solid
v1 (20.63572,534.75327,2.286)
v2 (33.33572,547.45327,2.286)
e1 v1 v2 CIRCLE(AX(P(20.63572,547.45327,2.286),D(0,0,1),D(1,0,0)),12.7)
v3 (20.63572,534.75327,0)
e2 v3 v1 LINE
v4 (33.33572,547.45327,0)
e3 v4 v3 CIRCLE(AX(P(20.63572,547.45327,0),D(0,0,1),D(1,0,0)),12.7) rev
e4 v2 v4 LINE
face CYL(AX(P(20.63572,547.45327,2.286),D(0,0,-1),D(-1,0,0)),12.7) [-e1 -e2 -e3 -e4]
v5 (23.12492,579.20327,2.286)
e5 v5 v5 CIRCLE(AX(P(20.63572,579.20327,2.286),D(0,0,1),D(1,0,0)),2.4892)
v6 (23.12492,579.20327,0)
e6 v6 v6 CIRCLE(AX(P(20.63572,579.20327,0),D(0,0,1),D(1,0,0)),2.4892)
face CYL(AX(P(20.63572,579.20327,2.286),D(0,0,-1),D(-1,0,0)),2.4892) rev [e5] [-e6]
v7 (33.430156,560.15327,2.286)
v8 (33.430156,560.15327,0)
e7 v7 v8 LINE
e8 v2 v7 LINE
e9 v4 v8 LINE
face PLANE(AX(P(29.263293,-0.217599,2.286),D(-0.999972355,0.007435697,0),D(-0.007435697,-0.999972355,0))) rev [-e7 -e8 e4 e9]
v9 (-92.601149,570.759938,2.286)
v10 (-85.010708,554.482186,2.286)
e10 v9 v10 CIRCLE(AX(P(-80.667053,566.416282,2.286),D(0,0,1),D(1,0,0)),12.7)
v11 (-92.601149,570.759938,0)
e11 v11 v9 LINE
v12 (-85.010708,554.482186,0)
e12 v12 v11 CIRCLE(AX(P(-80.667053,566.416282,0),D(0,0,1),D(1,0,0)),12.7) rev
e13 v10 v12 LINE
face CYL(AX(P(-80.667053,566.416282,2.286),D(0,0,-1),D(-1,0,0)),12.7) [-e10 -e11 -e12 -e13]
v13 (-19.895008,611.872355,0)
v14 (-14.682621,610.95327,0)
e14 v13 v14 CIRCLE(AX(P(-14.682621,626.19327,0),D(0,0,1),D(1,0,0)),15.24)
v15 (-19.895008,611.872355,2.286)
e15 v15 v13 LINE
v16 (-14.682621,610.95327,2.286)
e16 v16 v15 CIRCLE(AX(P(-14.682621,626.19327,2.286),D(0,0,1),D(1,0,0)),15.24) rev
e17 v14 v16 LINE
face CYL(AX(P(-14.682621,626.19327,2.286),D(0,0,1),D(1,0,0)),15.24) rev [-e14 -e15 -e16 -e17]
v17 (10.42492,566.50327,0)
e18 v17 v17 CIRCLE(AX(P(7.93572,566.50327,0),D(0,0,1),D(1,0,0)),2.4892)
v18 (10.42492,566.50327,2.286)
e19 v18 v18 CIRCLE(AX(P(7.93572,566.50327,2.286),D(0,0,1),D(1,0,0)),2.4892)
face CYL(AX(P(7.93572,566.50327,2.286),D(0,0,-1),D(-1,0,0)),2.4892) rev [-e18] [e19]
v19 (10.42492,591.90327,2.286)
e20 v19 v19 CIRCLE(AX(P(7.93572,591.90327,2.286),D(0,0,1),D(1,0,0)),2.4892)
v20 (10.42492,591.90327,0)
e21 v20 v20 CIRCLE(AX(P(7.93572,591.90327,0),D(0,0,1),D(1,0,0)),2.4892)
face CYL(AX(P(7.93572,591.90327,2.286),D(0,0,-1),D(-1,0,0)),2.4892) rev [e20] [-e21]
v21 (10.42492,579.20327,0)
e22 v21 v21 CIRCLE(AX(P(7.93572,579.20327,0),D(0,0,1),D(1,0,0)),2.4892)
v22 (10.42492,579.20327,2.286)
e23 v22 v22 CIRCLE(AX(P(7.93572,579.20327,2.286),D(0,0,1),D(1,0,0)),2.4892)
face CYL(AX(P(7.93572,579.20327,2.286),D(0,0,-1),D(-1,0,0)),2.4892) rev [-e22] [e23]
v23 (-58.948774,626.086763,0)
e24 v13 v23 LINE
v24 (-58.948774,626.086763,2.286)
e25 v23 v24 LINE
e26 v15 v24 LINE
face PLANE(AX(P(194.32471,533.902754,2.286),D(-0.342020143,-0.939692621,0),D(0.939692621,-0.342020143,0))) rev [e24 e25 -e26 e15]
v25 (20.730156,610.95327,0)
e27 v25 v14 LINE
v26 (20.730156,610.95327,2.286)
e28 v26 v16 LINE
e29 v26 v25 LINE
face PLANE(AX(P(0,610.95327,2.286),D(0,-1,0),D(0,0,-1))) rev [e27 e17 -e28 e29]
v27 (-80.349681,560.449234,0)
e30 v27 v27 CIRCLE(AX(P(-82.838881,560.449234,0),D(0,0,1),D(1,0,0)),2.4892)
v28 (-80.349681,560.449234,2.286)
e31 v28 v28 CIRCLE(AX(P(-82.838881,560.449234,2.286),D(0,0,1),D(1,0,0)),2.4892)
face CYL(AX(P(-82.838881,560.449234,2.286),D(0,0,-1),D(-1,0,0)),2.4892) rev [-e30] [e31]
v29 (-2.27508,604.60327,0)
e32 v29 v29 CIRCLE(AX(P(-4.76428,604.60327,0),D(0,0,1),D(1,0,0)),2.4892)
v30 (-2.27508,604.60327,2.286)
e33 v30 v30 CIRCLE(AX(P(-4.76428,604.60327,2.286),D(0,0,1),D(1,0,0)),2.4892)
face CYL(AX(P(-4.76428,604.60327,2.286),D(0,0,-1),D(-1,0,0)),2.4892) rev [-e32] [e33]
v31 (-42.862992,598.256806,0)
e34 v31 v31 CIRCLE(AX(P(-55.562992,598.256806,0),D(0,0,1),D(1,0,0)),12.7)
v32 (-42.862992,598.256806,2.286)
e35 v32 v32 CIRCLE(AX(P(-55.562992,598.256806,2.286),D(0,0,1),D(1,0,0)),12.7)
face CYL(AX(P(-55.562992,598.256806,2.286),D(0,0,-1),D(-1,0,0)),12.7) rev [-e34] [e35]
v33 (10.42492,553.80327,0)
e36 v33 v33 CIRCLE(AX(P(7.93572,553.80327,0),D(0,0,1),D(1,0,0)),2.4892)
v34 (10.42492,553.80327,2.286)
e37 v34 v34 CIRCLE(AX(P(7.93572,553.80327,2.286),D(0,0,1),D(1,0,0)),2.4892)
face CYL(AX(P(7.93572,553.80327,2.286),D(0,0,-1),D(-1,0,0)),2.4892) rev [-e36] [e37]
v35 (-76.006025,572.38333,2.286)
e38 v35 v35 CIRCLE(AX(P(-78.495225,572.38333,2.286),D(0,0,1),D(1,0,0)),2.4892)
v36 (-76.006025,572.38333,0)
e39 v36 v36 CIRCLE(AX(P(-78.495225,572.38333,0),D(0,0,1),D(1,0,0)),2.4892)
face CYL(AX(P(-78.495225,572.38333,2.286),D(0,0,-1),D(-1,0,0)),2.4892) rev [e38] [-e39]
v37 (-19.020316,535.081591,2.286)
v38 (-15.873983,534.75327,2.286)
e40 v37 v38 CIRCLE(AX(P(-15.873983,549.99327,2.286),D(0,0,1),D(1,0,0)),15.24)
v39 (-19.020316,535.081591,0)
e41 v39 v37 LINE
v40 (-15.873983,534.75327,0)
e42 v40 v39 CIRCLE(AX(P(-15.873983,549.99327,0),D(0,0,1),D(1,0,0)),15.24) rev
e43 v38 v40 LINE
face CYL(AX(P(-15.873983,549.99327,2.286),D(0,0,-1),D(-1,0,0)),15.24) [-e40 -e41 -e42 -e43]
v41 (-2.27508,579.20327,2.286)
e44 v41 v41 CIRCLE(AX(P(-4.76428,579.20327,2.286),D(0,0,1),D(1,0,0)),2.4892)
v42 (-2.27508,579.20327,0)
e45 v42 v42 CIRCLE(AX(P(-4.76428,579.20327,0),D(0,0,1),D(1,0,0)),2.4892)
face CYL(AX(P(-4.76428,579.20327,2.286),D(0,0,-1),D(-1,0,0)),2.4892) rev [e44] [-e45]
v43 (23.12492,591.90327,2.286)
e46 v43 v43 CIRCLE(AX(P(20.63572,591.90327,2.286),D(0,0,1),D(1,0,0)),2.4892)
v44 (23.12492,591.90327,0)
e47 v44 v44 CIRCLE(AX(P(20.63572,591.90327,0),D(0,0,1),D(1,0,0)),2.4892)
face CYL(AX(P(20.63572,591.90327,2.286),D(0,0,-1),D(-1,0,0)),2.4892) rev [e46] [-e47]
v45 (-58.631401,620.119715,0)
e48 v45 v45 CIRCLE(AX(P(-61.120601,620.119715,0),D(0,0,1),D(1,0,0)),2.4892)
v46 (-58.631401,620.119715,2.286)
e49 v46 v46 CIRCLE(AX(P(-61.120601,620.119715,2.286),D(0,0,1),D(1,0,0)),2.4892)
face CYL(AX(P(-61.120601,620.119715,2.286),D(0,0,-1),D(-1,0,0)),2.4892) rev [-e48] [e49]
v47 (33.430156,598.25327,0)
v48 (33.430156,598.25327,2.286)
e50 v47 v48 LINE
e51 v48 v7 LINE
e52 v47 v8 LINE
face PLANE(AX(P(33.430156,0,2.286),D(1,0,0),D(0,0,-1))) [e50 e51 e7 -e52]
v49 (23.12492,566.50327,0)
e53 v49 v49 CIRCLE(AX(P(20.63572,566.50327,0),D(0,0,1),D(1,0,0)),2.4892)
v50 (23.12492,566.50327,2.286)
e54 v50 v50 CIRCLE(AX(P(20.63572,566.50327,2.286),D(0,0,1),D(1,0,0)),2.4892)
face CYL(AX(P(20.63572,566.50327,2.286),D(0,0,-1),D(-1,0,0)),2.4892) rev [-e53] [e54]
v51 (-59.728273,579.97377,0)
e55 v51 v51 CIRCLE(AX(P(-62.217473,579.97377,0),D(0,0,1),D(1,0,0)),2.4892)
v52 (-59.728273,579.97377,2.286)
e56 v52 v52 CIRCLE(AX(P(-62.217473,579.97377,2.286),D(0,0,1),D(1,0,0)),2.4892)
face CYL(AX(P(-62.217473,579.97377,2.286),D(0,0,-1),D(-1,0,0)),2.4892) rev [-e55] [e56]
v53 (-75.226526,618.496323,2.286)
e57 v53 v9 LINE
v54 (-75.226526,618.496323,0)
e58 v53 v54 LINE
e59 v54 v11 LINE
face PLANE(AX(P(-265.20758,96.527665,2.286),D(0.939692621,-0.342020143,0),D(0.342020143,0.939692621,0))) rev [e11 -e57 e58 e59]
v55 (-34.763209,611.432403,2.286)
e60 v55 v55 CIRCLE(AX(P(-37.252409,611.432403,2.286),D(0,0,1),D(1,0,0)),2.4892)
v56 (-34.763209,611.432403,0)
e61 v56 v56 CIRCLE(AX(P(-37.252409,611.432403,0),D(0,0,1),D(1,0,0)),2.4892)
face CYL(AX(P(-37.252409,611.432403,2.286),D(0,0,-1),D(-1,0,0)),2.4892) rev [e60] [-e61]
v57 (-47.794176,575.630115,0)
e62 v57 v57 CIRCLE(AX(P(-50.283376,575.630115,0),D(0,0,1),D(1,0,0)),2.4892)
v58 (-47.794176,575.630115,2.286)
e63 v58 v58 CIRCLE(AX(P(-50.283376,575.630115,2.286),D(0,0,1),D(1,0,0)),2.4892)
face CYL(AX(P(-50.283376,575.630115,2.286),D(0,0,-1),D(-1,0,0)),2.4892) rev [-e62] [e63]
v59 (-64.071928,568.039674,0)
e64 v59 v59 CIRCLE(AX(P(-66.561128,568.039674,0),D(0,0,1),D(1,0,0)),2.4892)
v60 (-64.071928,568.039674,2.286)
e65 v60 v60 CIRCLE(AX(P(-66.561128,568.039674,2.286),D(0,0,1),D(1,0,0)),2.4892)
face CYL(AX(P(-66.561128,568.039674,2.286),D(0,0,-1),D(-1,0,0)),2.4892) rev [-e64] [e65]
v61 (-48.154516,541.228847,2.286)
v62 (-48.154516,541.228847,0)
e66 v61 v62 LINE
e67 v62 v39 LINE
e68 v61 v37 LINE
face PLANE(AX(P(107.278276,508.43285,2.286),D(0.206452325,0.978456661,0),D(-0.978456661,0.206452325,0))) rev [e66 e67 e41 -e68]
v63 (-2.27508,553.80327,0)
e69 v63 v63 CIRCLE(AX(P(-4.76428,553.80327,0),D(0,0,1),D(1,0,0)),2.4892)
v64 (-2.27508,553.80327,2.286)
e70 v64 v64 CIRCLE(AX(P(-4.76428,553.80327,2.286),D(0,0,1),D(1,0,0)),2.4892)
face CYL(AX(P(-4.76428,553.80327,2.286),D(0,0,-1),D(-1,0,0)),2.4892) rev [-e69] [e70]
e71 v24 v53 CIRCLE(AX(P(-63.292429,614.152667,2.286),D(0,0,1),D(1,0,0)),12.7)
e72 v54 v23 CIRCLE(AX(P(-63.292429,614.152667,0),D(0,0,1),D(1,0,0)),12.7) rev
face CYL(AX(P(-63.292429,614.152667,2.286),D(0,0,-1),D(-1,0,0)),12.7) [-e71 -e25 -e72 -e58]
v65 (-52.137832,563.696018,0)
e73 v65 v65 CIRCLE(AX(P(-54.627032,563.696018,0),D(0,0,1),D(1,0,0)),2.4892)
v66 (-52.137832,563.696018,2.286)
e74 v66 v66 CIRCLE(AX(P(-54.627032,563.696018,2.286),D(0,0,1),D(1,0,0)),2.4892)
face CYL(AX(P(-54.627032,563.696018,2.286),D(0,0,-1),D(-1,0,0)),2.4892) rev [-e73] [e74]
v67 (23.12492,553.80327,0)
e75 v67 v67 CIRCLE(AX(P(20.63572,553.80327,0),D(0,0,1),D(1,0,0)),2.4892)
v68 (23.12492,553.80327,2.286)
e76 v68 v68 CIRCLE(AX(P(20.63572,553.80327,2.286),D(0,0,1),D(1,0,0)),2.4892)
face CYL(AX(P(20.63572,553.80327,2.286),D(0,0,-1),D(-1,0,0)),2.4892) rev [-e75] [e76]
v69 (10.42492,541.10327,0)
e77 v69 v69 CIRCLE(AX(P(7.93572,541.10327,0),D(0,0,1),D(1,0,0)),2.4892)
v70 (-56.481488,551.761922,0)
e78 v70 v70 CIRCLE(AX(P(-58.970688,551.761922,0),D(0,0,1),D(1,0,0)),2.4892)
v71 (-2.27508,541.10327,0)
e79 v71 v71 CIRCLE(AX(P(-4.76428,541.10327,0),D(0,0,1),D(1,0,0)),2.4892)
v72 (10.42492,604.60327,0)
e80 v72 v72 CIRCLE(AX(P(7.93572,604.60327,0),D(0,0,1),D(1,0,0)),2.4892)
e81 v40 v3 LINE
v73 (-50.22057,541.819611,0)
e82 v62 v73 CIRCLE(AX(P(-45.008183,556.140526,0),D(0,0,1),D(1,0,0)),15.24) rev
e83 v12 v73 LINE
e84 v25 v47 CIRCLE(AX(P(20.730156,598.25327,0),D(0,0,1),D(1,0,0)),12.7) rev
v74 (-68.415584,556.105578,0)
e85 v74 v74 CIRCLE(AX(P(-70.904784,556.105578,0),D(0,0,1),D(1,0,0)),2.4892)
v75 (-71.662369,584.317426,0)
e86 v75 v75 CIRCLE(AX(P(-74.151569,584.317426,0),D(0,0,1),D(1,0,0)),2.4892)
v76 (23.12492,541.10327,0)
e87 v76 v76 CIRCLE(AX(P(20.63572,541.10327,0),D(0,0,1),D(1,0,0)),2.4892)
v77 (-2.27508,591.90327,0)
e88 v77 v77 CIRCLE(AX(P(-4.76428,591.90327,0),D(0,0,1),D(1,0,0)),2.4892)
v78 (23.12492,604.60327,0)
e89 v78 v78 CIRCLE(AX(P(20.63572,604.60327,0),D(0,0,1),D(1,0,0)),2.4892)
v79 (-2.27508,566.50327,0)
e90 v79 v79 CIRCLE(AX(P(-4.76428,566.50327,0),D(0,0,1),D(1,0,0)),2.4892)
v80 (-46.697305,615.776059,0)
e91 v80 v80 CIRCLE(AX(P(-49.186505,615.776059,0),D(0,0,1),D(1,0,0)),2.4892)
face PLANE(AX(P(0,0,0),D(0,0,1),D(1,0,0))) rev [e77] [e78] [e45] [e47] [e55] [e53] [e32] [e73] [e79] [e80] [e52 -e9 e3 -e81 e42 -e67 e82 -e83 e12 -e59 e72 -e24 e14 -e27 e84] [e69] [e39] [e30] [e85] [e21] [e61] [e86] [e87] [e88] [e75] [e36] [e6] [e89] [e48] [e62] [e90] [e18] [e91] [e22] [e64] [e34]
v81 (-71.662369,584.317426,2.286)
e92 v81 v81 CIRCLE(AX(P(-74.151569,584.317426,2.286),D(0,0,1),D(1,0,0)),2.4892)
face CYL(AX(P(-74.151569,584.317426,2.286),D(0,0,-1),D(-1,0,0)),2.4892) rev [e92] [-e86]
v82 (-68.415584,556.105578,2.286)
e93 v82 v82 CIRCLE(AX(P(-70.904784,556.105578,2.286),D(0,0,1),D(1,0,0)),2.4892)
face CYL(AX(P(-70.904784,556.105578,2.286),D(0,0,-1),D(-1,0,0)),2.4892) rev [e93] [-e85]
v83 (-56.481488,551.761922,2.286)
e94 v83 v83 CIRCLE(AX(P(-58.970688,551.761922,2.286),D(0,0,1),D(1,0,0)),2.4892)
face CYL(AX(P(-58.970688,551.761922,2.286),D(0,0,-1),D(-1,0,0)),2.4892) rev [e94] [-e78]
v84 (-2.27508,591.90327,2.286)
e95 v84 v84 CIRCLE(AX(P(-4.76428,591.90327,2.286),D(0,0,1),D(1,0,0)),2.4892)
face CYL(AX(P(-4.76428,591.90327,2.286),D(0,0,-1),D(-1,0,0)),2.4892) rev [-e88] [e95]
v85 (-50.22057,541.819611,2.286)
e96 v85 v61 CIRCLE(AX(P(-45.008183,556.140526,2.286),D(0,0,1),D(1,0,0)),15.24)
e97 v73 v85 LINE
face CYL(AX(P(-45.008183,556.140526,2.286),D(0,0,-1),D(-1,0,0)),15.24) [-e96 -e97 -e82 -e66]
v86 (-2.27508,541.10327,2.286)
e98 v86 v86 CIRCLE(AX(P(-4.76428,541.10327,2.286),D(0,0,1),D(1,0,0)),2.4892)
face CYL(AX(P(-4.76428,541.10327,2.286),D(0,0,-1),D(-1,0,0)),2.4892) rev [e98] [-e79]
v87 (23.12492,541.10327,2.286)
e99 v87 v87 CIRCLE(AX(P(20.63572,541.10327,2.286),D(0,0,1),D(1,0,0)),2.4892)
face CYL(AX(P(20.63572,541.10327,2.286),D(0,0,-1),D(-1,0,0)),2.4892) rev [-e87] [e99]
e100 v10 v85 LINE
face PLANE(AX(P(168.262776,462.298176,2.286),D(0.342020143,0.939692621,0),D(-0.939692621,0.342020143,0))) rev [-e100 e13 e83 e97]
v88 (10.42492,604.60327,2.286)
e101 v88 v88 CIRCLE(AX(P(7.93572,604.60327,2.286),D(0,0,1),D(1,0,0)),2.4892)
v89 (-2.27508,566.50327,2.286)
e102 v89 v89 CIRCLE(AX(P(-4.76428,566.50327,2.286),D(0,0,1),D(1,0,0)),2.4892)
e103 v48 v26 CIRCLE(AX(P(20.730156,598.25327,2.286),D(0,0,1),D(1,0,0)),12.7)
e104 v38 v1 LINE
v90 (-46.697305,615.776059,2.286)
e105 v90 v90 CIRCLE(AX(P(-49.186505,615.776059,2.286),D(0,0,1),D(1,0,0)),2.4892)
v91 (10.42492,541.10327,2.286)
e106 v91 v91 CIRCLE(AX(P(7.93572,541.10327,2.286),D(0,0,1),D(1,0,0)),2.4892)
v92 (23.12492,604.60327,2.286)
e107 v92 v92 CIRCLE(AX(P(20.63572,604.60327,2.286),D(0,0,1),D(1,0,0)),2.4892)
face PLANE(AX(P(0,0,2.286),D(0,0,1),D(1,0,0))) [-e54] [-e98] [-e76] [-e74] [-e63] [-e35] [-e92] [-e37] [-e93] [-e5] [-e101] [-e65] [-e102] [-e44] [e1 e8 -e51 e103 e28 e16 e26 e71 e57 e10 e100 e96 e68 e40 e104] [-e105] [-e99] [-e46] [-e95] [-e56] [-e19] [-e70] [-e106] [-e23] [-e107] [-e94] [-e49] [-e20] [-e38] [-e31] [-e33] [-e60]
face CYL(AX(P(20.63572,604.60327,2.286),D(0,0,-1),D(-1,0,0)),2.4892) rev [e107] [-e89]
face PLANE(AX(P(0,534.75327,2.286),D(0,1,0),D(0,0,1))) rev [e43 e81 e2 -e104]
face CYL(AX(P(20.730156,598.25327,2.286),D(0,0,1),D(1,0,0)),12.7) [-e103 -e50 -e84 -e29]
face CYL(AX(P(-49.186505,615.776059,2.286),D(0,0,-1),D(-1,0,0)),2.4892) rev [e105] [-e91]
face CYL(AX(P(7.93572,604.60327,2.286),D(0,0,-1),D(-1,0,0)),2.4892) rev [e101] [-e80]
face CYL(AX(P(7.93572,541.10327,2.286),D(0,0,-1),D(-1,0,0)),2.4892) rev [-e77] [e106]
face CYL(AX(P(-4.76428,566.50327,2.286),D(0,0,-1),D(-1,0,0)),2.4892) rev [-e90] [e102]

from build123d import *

# Parameters (mm, degrees)
SKETCH2_R           = 2.4892
SKETCH2_R_2         = 12.7
BOSS_EXTRUDE1_DEPTH = 2.286
FILLET6_R           = 12.7
FILLET7_R           = 15.24


with BuildPart() as part:
    # Sketch2 → Boss-Extrude1 (new body)
    with BuildSketch(Plane.XY):
        Polygon((33.430156219, 560.153270419), (33.430156219, 610.953270419), (-17.369843781, 610.953270419), (-70.882869838, 630.430419049), (-92.601148921, 570.759937623), (-96.944804742, 558.825841339), (-49.208419606, 541.451218058), (-17.464279743, 534.753270419), (33.335720257, 534.753270419), (33.335720257, 547.453270419), align=None)
        with Locations((-4.764279743, 566.503270419)):
            Circle(SKETCH2_R, mode=Mode.SUBTRACT)
        with Locations((-4.764279743, 579.203270419)):
            Circle(SKETCH2_R, mode=Mode.SUBTRACT)
        with Locations((7.935720257, 566.503270419)):
            Circle(SKETCH2_R, mode=Mode.SUBTRACT)
        with Locations((20.635720257, 566.503270419)):
            Circle(SKETCH2_R, mode=Mode.SUBTRACT)
        with Locations((7.935720257, 579.203270419)):
            Circle(SKETCH2_R, mode=Mode.SUBTRACT)
        with Locations((20.635720257, 579.203270419)):
            Circle(SKETCH2_R, mode=Mode.SUBTRACT)
        with Locations((-4.764279743, 591.903270419)):
            Circle(SKETCH2_R, mode=Mode.SUBTRACT)
        with Locations((-4.764279743, 604.603270419)):
            Circle(SKETCH2_R, mode=Mode.SUBTRACT)
        with Locations((7.935720257, 591.903270419)):
            Circle(SKETCH2_R, mode=Mode.SUBTRACT)
        with Locations((20.635720257, 591.903270419)):
            Circle(SKETCH2_R, mode=Mode.SUBTRACT)
        with Locations((7.935720257, 604.603270419)):
            Circle(SKETCH2_R, mode=Mode.SUBTRACT)
        with Locations((20.635720257, 604.603270419)):
            Circle(SKETCH2_R, mode=Mode.SUBTRACT)
        with Locations((20.635720257, 553.803270419)):
            Circle(SKETCH2_R, mode=Mode.SUBTRACT)
        with Locations((-4.764279743, 553.803270419)):
            Circle(SKETCH2_R, mode=Mode.SUBTRACT)
        with Locations((7.935720257, 553.803270419)):
            Circle(SKETCH2_R, mode=Mode.SUBTRACT)
        with Locations((20.635720257, 541.103270419)):
            Circle(SKETCH2_R, mode=Mode.SUBTRACT)
        with Locations((7.935720257, 541.103270419)):
            Circle(SKETCH2_R, mode=Mode.SUBTRACT)
        with Locations((-4.764279743, 541.103270419)):
            Circle(SKETCH2_R, mode=Mode.SUBTRACT)
        with Locations((-37.25240889, 611.432403444)):
            Circle(SKETCH2_R, mode=Mode.SUBTRACT)
        with Locations((-50.283376351, 575.630114592)):
            Circle(SKETCH2_R, mode=Mode.SUBTRACT)
        with Locations((-62.217472635, 579.973770413)):
            Circle(SKETCH2_R, mode=Mode.SUBTRACT)
        with Locations((-74.151568919, 584.317426233)):
            Circle(SKETCH2_R, mode=Mode.SUBTRACT)
        with Locations((-55.562991918, 598.25680592)):
            Circle(SKETCH2_R_2, mode=Mode.SUBTRACT)
        with Locations((-61.120601458, 620.119715085)):
            Circle(SKETCH2_R, mode=Mode.SUBTRACT)
        with Locations((-49.186505174, 615.776059265)):
            Circle(SKETCH2_R, mode=Mode.SUBTRACT)
        with Locations((-78.495224739, 572.383329949)):
            Circle(SKETCH2_R, mode=Mode.SUBTRACT)
        with Locations((-54.627032171, 563.696018308)):
            Circle(SKETCH2_R, mode=Mode.SUBTRACT)
        with Locations((-66.561128455, 568.039674129)):
            Circle(SKETCH2_R, mode=Mode.SUBTRACT)
        with Locations((-58.970687991, 551.761922025)):
            Circle(SKETCH2_R, mode=Mode.SUBTRACT)
        with Locations((-82.838880559, 560.449233665)):
            Circle(SKETCH2_R, mode=Mode.SUBTRACT)
        with Locations((-70.904784275, 556.105577845)):
            Circle(SKETCH2_R, mode=Mode.SUBTRACT)
    extrude(amount=BOSS_EXTRUDE1_DEPTH)

    # Fillet6
    fillet6_edges = [part.edges().sort_by_distance(p)[0] for p in [
        (-70.882869838, 630.430419049, 1.143),
        (-96.944804742, 558.825841339, 1.143),
        (33.430156219, 610.953270419, 1.143),
        (33.335720257, 534.753270419, 1.143),
    ]]
    fillet(fillet6_edges, radius=FILLET6_R - 0.0001)  # a hair under: the kernel refuses the full size

    # Fillet7
    fillet7_edges = [part.edges().sort_by_distance(p)[0] for p in [
        (-17.464279743, 534.753270419, 1.143),
        (-49.208419606, 541.451218058, 1.143),
        (-17.369843781, 610.953270419, 1.143),
    ]]
    fillet(fillet7_edges, radius=FILLET7_R)


solid = part.part
